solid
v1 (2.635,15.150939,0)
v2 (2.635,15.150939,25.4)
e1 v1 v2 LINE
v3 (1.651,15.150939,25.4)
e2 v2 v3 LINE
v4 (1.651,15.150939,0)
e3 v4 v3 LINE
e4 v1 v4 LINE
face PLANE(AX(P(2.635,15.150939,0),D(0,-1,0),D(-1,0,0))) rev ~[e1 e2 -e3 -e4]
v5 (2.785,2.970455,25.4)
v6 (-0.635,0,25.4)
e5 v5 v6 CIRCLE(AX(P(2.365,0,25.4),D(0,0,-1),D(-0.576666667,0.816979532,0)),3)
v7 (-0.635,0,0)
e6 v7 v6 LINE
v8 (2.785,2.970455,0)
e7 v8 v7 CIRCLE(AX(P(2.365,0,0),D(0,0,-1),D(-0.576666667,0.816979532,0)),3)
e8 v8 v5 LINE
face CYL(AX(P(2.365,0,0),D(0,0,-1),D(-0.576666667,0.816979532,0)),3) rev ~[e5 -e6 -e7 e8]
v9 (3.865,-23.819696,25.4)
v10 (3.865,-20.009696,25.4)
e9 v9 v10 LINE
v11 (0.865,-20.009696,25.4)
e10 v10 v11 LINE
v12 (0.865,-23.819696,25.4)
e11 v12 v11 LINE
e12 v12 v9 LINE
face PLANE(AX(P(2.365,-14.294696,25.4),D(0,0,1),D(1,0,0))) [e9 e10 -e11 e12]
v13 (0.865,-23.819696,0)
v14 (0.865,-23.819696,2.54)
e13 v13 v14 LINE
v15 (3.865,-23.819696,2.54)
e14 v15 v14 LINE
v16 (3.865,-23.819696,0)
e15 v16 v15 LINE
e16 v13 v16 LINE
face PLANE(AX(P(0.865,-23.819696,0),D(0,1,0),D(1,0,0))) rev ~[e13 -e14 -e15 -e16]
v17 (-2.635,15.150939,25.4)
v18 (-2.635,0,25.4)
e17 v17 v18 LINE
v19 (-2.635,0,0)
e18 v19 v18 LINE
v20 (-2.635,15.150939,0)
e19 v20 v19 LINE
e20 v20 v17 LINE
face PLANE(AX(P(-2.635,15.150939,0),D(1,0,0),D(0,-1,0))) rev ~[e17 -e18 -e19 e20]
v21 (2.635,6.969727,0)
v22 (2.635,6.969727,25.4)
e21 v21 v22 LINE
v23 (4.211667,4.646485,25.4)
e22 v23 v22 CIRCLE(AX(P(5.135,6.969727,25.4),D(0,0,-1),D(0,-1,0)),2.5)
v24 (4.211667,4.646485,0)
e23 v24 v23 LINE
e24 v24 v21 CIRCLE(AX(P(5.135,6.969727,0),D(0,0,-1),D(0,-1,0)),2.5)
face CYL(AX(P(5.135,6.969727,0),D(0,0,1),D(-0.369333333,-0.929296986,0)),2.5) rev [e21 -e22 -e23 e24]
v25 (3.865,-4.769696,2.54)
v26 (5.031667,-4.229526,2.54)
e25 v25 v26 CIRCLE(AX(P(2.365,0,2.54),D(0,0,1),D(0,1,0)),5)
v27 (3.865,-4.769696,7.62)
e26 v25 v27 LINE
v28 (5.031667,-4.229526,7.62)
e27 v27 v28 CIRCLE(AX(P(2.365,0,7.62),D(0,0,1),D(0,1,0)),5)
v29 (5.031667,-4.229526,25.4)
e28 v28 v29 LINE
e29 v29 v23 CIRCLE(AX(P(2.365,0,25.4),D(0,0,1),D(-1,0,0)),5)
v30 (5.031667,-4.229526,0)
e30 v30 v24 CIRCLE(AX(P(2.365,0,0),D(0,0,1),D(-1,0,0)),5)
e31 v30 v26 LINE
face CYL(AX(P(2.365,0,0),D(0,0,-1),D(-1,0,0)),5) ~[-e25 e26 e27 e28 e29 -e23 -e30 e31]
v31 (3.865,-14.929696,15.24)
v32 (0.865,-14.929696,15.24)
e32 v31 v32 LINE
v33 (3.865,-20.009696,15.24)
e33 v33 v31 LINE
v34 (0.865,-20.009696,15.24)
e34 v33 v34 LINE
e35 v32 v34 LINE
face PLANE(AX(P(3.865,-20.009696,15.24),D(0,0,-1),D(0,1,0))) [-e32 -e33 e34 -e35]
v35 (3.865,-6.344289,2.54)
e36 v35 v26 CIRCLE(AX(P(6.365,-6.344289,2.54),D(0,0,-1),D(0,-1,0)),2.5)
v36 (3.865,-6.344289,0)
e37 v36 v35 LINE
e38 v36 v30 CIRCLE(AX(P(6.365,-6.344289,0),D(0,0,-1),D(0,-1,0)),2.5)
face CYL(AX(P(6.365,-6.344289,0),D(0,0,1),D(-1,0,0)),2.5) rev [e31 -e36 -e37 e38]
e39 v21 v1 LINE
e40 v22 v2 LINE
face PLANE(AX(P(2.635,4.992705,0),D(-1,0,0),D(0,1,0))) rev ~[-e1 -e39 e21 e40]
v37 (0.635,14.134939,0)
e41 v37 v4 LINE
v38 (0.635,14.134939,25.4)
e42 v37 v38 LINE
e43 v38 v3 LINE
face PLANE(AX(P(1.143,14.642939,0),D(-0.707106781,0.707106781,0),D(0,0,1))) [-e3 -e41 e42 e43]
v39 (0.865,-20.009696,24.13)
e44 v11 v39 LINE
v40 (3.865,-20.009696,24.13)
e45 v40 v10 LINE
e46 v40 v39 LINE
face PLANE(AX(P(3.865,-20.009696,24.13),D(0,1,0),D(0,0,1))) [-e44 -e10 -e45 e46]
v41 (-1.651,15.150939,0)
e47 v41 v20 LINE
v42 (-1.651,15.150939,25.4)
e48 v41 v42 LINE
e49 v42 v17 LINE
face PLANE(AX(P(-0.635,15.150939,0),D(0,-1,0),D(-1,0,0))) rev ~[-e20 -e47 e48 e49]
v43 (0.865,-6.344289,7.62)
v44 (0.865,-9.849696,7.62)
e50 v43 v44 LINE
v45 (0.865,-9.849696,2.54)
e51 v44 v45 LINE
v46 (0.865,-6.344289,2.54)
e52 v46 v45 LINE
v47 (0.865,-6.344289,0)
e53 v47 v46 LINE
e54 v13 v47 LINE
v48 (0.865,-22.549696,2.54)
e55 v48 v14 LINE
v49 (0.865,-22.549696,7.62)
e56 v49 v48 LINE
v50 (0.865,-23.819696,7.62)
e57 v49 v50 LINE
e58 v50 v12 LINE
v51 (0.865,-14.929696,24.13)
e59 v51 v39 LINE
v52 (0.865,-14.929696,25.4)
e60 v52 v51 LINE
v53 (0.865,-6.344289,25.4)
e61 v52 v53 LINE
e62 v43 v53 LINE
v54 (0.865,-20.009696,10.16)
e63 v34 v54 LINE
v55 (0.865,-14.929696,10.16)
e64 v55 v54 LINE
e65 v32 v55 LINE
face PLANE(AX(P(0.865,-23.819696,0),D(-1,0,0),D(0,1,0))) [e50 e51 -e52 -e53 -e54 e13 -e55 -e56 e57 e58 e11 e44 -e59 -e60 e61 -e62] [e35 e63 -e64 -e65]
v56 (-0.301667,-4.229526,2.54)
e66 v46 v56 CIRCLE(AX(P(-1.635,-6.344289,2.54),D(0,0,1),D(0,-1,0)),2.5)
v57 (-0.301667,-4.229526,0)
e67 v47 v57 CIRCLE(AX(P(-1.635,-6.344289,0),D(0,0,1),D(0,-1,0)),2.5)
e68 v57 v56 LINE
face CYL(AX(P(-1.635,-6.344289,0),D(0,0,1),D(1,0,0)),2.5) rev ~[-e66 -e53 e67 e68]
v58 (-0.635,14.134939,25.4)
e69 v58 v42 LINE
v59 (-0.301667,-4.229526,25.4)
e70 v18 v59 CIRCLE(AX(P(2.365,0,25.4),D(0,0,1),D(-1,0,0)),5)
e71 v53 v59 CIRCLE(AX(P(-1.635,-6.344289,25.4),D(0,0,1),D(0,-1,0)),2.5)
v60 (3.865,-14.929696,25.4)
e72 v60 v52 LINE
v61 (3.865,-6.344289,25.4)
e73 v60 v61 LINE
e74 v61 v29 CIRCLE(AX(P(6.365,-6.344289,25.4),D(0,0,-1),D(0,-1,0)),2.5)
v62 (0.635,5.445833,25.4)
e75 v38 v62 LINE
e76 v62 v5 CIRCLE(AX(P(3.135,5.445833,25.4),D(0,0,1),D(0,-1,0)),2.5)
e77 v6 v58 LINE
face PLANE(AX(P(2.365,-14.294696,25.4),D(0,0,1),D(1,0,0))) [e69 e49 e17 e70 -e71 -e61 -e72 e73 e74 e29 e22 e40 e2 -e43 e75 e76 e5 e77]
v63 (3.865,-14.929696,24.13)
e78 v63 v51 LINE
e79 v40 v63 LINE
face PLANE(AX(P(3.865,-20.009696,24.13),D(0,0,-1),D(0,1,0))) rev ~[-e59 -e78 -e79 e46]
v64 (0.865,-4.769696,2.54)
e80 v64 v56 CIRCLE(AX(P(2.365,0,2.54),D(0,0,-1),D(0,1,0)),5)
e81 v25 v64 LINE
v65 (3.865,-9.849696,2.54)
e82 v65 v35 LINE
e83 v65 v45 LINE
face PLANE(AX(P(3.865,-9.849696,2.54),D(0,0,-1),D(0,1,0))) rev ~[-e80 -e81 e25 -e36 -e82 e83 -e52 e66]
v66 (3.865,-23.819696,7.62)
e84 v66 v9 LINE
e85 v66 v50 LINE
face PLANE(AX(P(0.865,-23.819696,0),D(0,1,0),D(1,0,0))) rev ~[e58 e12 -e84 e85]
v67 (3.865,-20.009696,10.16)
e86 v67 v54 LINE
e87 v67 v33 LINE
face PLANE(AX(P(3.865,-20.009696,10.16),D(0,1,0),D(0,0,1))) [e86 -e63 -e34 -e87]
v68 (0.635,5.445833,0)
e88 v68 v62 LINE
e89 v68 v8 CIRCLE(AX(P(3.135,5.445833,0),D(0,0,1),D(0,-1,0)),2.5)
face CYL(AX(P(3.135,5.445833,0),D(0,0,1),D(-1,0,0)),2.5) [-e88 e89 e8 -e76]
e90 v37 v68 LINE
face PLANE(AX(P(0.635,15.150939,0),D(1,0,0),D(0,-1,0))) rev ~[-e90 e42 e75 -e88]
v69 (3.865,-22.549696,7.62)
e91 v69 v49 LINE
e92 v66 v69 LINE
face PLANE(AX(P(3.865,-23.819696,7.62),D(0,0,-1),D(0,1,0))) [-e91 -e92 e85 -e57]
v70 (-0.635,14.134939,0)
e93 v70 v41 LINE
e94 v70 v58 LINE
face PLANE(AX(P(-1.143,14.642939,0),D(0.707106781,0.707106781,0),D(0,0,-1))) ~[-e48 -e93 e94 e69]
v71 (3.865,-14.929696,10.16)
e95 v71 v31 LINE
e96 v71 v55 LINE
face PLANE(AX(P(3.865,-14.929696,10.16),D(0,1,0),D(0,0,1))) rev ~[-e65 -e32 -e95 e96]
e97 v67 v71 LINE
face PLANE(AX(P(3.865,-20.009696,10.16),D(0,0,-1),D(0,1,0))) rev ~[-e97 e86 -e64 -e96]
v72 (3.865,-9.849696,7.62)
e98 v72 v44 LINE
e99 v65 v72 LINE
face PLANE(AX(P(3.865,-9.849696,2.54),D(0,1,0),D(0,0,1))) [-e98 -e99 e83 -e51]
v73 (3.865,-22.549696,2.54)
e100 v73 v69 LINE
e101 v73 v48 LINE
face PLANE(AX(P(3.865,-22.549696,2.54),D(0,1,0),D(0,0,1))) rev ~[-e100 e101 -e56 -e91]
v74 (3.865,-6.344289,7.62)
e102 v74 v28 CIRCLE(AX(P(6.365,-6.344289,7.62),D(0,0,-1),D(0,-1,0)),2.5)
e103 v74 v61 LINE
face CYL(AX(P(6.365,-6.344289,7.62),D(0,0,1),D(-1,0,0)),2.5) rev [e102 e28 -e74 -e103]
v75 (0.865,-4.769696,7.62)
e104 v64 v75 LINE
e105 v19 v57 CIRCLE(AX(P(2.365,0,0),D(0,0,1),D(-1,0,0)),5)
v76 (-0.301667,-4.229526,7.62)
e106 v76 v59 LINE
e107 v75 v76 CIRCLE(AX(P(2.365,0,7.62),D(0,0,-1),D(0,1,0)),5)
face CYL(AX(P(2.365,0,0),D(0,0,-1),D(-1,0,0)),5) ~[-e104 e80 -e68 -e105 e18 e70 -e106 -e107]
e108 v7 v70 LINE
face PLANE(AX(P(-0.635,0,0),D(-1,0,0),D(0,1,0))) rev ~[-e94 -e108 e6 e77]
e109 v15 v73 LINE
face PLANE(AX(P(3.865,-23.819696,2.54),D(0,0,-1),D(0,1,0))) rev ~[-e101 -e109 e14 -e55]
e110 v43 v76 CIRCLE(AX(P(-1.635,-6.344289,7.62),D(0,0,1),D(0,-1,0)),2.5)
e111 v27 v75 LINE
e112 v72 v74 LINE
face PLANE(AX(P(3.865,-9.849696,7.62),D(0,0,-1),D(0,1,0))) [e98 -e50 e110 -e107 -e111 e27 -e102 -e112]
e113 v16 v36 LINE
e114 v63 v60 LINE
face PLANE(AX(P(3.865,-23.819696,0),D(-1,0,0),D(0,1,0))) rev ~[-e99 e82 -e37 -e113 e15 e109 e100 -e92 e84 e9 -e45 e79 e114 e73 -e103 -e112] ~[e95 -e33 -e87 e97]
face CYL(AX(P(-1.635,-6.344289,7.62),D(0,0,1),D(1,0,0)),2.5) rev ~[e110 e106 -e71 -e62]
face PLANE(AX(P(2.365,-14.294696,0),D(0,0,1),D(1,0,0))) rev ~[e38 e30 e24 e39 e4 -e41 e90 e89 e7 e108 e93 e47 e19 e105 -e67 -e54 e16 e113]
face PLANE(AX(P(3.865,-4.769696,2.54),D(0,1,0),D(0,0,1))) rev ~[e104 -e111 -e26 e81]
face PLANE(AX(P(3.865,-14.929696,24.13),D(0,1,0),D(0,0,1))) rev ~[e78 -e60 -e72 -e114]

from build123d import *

# Parameters (mm, degrees)
F1_DEPTH = 25.4
F2_SIZE  = 1.016
F3_W     = 3
F3_H     = 19.05
F4_DEPTH = 25.4
F5_W     = 5.08
F5_H     = 5.08
F5_W_2   = 1.27
F5_H_2   = 1.27
F6_DEPTH = 6.501
F7_R     = 2.5


with BuildPart() as f1:
    # F0 (on Top) → F1 (new body)
    with BuildSketch(Plane.XY):
        with BuildLine():
            Line((0.635, 15.1509385957), (0.635, 2.4509385957))
            ThreePointArc((0.635, 2.4509385957), (5.0286441204, -1.3802173742), (-0.635, 0))
            Line((-0.635, 0), (-0.635, 15.1509385957))
            Line((-0.635, 15.1509385957), (-2.635, 15.1509385957))
            Line((-2.635, 15.1509385957), (-2.635, 0))
            ThreePointArc((-2.635, 0), (5.8037497728, -3.6297382826), (2.635, 4.9927046778))
            Line((2.635, 4.9927046778), (2.635, 15.1509385957))
            Line((2.635, 15.1509385957), (0.635, 15.1509385957))
        make_face()
    extrude(amount=F1_DEPTH)

    # F2
    f2_edges = [f1.edges().sort_by_distance(p)[0] for p in [
        (-0.635, 15.150939, 12.7),
        (0.635, 15.150939, 12.7),
    ]]
    chamfer(f2_edges, length=F2_SIZE)

    # F3 (on Top) → F4 (join, through all)
    with BuildSketch(Plane.XY):
        with Locations((2.365, -14.2946960071)):
            Rectangle(F3_W, F3_H)
    extrude(amount=F4_DEPTH)

    # F5 (on face) → F6 (cut, through all)
    with BuildSketch(Plane.YZ.offset(3.865)):
        with Locations((-7.3096960071, 5.08)):
            Rectangle(F5_W, F5_H)
        with Locations((-17.4696960071, 12.7)):
            Rectangle(F5_W, F5_H)
        with Locations((-23.1846960071, 5.08)):
            Rectangle(F5_W_2, F5_H)
        with Locations((-17.4696960071, 24.765)):
            Rectangle(F5_W, F5_H_2)
    extrude(amount=-F6_DEPTH, mode=Mode.SUBTRACT)

    # F7
    f7_edges = [f1.edges().sort_by_distance(p)[0] for p in [
        (0.635, 2.450939, 12.7),
        (-2.635, 0, 12.7),
        (2.635, 4.992705, 12.7),
        (3.865, -4.769696, 16.51),
        (0.865, -4.769696, 16.51),
        (0.865, -4.769696, 1.27),
        (3.865, -4.769696, 1.27),
    ]]
    fillet(f7_edges, radius=F7_R)


solid = f1.part
